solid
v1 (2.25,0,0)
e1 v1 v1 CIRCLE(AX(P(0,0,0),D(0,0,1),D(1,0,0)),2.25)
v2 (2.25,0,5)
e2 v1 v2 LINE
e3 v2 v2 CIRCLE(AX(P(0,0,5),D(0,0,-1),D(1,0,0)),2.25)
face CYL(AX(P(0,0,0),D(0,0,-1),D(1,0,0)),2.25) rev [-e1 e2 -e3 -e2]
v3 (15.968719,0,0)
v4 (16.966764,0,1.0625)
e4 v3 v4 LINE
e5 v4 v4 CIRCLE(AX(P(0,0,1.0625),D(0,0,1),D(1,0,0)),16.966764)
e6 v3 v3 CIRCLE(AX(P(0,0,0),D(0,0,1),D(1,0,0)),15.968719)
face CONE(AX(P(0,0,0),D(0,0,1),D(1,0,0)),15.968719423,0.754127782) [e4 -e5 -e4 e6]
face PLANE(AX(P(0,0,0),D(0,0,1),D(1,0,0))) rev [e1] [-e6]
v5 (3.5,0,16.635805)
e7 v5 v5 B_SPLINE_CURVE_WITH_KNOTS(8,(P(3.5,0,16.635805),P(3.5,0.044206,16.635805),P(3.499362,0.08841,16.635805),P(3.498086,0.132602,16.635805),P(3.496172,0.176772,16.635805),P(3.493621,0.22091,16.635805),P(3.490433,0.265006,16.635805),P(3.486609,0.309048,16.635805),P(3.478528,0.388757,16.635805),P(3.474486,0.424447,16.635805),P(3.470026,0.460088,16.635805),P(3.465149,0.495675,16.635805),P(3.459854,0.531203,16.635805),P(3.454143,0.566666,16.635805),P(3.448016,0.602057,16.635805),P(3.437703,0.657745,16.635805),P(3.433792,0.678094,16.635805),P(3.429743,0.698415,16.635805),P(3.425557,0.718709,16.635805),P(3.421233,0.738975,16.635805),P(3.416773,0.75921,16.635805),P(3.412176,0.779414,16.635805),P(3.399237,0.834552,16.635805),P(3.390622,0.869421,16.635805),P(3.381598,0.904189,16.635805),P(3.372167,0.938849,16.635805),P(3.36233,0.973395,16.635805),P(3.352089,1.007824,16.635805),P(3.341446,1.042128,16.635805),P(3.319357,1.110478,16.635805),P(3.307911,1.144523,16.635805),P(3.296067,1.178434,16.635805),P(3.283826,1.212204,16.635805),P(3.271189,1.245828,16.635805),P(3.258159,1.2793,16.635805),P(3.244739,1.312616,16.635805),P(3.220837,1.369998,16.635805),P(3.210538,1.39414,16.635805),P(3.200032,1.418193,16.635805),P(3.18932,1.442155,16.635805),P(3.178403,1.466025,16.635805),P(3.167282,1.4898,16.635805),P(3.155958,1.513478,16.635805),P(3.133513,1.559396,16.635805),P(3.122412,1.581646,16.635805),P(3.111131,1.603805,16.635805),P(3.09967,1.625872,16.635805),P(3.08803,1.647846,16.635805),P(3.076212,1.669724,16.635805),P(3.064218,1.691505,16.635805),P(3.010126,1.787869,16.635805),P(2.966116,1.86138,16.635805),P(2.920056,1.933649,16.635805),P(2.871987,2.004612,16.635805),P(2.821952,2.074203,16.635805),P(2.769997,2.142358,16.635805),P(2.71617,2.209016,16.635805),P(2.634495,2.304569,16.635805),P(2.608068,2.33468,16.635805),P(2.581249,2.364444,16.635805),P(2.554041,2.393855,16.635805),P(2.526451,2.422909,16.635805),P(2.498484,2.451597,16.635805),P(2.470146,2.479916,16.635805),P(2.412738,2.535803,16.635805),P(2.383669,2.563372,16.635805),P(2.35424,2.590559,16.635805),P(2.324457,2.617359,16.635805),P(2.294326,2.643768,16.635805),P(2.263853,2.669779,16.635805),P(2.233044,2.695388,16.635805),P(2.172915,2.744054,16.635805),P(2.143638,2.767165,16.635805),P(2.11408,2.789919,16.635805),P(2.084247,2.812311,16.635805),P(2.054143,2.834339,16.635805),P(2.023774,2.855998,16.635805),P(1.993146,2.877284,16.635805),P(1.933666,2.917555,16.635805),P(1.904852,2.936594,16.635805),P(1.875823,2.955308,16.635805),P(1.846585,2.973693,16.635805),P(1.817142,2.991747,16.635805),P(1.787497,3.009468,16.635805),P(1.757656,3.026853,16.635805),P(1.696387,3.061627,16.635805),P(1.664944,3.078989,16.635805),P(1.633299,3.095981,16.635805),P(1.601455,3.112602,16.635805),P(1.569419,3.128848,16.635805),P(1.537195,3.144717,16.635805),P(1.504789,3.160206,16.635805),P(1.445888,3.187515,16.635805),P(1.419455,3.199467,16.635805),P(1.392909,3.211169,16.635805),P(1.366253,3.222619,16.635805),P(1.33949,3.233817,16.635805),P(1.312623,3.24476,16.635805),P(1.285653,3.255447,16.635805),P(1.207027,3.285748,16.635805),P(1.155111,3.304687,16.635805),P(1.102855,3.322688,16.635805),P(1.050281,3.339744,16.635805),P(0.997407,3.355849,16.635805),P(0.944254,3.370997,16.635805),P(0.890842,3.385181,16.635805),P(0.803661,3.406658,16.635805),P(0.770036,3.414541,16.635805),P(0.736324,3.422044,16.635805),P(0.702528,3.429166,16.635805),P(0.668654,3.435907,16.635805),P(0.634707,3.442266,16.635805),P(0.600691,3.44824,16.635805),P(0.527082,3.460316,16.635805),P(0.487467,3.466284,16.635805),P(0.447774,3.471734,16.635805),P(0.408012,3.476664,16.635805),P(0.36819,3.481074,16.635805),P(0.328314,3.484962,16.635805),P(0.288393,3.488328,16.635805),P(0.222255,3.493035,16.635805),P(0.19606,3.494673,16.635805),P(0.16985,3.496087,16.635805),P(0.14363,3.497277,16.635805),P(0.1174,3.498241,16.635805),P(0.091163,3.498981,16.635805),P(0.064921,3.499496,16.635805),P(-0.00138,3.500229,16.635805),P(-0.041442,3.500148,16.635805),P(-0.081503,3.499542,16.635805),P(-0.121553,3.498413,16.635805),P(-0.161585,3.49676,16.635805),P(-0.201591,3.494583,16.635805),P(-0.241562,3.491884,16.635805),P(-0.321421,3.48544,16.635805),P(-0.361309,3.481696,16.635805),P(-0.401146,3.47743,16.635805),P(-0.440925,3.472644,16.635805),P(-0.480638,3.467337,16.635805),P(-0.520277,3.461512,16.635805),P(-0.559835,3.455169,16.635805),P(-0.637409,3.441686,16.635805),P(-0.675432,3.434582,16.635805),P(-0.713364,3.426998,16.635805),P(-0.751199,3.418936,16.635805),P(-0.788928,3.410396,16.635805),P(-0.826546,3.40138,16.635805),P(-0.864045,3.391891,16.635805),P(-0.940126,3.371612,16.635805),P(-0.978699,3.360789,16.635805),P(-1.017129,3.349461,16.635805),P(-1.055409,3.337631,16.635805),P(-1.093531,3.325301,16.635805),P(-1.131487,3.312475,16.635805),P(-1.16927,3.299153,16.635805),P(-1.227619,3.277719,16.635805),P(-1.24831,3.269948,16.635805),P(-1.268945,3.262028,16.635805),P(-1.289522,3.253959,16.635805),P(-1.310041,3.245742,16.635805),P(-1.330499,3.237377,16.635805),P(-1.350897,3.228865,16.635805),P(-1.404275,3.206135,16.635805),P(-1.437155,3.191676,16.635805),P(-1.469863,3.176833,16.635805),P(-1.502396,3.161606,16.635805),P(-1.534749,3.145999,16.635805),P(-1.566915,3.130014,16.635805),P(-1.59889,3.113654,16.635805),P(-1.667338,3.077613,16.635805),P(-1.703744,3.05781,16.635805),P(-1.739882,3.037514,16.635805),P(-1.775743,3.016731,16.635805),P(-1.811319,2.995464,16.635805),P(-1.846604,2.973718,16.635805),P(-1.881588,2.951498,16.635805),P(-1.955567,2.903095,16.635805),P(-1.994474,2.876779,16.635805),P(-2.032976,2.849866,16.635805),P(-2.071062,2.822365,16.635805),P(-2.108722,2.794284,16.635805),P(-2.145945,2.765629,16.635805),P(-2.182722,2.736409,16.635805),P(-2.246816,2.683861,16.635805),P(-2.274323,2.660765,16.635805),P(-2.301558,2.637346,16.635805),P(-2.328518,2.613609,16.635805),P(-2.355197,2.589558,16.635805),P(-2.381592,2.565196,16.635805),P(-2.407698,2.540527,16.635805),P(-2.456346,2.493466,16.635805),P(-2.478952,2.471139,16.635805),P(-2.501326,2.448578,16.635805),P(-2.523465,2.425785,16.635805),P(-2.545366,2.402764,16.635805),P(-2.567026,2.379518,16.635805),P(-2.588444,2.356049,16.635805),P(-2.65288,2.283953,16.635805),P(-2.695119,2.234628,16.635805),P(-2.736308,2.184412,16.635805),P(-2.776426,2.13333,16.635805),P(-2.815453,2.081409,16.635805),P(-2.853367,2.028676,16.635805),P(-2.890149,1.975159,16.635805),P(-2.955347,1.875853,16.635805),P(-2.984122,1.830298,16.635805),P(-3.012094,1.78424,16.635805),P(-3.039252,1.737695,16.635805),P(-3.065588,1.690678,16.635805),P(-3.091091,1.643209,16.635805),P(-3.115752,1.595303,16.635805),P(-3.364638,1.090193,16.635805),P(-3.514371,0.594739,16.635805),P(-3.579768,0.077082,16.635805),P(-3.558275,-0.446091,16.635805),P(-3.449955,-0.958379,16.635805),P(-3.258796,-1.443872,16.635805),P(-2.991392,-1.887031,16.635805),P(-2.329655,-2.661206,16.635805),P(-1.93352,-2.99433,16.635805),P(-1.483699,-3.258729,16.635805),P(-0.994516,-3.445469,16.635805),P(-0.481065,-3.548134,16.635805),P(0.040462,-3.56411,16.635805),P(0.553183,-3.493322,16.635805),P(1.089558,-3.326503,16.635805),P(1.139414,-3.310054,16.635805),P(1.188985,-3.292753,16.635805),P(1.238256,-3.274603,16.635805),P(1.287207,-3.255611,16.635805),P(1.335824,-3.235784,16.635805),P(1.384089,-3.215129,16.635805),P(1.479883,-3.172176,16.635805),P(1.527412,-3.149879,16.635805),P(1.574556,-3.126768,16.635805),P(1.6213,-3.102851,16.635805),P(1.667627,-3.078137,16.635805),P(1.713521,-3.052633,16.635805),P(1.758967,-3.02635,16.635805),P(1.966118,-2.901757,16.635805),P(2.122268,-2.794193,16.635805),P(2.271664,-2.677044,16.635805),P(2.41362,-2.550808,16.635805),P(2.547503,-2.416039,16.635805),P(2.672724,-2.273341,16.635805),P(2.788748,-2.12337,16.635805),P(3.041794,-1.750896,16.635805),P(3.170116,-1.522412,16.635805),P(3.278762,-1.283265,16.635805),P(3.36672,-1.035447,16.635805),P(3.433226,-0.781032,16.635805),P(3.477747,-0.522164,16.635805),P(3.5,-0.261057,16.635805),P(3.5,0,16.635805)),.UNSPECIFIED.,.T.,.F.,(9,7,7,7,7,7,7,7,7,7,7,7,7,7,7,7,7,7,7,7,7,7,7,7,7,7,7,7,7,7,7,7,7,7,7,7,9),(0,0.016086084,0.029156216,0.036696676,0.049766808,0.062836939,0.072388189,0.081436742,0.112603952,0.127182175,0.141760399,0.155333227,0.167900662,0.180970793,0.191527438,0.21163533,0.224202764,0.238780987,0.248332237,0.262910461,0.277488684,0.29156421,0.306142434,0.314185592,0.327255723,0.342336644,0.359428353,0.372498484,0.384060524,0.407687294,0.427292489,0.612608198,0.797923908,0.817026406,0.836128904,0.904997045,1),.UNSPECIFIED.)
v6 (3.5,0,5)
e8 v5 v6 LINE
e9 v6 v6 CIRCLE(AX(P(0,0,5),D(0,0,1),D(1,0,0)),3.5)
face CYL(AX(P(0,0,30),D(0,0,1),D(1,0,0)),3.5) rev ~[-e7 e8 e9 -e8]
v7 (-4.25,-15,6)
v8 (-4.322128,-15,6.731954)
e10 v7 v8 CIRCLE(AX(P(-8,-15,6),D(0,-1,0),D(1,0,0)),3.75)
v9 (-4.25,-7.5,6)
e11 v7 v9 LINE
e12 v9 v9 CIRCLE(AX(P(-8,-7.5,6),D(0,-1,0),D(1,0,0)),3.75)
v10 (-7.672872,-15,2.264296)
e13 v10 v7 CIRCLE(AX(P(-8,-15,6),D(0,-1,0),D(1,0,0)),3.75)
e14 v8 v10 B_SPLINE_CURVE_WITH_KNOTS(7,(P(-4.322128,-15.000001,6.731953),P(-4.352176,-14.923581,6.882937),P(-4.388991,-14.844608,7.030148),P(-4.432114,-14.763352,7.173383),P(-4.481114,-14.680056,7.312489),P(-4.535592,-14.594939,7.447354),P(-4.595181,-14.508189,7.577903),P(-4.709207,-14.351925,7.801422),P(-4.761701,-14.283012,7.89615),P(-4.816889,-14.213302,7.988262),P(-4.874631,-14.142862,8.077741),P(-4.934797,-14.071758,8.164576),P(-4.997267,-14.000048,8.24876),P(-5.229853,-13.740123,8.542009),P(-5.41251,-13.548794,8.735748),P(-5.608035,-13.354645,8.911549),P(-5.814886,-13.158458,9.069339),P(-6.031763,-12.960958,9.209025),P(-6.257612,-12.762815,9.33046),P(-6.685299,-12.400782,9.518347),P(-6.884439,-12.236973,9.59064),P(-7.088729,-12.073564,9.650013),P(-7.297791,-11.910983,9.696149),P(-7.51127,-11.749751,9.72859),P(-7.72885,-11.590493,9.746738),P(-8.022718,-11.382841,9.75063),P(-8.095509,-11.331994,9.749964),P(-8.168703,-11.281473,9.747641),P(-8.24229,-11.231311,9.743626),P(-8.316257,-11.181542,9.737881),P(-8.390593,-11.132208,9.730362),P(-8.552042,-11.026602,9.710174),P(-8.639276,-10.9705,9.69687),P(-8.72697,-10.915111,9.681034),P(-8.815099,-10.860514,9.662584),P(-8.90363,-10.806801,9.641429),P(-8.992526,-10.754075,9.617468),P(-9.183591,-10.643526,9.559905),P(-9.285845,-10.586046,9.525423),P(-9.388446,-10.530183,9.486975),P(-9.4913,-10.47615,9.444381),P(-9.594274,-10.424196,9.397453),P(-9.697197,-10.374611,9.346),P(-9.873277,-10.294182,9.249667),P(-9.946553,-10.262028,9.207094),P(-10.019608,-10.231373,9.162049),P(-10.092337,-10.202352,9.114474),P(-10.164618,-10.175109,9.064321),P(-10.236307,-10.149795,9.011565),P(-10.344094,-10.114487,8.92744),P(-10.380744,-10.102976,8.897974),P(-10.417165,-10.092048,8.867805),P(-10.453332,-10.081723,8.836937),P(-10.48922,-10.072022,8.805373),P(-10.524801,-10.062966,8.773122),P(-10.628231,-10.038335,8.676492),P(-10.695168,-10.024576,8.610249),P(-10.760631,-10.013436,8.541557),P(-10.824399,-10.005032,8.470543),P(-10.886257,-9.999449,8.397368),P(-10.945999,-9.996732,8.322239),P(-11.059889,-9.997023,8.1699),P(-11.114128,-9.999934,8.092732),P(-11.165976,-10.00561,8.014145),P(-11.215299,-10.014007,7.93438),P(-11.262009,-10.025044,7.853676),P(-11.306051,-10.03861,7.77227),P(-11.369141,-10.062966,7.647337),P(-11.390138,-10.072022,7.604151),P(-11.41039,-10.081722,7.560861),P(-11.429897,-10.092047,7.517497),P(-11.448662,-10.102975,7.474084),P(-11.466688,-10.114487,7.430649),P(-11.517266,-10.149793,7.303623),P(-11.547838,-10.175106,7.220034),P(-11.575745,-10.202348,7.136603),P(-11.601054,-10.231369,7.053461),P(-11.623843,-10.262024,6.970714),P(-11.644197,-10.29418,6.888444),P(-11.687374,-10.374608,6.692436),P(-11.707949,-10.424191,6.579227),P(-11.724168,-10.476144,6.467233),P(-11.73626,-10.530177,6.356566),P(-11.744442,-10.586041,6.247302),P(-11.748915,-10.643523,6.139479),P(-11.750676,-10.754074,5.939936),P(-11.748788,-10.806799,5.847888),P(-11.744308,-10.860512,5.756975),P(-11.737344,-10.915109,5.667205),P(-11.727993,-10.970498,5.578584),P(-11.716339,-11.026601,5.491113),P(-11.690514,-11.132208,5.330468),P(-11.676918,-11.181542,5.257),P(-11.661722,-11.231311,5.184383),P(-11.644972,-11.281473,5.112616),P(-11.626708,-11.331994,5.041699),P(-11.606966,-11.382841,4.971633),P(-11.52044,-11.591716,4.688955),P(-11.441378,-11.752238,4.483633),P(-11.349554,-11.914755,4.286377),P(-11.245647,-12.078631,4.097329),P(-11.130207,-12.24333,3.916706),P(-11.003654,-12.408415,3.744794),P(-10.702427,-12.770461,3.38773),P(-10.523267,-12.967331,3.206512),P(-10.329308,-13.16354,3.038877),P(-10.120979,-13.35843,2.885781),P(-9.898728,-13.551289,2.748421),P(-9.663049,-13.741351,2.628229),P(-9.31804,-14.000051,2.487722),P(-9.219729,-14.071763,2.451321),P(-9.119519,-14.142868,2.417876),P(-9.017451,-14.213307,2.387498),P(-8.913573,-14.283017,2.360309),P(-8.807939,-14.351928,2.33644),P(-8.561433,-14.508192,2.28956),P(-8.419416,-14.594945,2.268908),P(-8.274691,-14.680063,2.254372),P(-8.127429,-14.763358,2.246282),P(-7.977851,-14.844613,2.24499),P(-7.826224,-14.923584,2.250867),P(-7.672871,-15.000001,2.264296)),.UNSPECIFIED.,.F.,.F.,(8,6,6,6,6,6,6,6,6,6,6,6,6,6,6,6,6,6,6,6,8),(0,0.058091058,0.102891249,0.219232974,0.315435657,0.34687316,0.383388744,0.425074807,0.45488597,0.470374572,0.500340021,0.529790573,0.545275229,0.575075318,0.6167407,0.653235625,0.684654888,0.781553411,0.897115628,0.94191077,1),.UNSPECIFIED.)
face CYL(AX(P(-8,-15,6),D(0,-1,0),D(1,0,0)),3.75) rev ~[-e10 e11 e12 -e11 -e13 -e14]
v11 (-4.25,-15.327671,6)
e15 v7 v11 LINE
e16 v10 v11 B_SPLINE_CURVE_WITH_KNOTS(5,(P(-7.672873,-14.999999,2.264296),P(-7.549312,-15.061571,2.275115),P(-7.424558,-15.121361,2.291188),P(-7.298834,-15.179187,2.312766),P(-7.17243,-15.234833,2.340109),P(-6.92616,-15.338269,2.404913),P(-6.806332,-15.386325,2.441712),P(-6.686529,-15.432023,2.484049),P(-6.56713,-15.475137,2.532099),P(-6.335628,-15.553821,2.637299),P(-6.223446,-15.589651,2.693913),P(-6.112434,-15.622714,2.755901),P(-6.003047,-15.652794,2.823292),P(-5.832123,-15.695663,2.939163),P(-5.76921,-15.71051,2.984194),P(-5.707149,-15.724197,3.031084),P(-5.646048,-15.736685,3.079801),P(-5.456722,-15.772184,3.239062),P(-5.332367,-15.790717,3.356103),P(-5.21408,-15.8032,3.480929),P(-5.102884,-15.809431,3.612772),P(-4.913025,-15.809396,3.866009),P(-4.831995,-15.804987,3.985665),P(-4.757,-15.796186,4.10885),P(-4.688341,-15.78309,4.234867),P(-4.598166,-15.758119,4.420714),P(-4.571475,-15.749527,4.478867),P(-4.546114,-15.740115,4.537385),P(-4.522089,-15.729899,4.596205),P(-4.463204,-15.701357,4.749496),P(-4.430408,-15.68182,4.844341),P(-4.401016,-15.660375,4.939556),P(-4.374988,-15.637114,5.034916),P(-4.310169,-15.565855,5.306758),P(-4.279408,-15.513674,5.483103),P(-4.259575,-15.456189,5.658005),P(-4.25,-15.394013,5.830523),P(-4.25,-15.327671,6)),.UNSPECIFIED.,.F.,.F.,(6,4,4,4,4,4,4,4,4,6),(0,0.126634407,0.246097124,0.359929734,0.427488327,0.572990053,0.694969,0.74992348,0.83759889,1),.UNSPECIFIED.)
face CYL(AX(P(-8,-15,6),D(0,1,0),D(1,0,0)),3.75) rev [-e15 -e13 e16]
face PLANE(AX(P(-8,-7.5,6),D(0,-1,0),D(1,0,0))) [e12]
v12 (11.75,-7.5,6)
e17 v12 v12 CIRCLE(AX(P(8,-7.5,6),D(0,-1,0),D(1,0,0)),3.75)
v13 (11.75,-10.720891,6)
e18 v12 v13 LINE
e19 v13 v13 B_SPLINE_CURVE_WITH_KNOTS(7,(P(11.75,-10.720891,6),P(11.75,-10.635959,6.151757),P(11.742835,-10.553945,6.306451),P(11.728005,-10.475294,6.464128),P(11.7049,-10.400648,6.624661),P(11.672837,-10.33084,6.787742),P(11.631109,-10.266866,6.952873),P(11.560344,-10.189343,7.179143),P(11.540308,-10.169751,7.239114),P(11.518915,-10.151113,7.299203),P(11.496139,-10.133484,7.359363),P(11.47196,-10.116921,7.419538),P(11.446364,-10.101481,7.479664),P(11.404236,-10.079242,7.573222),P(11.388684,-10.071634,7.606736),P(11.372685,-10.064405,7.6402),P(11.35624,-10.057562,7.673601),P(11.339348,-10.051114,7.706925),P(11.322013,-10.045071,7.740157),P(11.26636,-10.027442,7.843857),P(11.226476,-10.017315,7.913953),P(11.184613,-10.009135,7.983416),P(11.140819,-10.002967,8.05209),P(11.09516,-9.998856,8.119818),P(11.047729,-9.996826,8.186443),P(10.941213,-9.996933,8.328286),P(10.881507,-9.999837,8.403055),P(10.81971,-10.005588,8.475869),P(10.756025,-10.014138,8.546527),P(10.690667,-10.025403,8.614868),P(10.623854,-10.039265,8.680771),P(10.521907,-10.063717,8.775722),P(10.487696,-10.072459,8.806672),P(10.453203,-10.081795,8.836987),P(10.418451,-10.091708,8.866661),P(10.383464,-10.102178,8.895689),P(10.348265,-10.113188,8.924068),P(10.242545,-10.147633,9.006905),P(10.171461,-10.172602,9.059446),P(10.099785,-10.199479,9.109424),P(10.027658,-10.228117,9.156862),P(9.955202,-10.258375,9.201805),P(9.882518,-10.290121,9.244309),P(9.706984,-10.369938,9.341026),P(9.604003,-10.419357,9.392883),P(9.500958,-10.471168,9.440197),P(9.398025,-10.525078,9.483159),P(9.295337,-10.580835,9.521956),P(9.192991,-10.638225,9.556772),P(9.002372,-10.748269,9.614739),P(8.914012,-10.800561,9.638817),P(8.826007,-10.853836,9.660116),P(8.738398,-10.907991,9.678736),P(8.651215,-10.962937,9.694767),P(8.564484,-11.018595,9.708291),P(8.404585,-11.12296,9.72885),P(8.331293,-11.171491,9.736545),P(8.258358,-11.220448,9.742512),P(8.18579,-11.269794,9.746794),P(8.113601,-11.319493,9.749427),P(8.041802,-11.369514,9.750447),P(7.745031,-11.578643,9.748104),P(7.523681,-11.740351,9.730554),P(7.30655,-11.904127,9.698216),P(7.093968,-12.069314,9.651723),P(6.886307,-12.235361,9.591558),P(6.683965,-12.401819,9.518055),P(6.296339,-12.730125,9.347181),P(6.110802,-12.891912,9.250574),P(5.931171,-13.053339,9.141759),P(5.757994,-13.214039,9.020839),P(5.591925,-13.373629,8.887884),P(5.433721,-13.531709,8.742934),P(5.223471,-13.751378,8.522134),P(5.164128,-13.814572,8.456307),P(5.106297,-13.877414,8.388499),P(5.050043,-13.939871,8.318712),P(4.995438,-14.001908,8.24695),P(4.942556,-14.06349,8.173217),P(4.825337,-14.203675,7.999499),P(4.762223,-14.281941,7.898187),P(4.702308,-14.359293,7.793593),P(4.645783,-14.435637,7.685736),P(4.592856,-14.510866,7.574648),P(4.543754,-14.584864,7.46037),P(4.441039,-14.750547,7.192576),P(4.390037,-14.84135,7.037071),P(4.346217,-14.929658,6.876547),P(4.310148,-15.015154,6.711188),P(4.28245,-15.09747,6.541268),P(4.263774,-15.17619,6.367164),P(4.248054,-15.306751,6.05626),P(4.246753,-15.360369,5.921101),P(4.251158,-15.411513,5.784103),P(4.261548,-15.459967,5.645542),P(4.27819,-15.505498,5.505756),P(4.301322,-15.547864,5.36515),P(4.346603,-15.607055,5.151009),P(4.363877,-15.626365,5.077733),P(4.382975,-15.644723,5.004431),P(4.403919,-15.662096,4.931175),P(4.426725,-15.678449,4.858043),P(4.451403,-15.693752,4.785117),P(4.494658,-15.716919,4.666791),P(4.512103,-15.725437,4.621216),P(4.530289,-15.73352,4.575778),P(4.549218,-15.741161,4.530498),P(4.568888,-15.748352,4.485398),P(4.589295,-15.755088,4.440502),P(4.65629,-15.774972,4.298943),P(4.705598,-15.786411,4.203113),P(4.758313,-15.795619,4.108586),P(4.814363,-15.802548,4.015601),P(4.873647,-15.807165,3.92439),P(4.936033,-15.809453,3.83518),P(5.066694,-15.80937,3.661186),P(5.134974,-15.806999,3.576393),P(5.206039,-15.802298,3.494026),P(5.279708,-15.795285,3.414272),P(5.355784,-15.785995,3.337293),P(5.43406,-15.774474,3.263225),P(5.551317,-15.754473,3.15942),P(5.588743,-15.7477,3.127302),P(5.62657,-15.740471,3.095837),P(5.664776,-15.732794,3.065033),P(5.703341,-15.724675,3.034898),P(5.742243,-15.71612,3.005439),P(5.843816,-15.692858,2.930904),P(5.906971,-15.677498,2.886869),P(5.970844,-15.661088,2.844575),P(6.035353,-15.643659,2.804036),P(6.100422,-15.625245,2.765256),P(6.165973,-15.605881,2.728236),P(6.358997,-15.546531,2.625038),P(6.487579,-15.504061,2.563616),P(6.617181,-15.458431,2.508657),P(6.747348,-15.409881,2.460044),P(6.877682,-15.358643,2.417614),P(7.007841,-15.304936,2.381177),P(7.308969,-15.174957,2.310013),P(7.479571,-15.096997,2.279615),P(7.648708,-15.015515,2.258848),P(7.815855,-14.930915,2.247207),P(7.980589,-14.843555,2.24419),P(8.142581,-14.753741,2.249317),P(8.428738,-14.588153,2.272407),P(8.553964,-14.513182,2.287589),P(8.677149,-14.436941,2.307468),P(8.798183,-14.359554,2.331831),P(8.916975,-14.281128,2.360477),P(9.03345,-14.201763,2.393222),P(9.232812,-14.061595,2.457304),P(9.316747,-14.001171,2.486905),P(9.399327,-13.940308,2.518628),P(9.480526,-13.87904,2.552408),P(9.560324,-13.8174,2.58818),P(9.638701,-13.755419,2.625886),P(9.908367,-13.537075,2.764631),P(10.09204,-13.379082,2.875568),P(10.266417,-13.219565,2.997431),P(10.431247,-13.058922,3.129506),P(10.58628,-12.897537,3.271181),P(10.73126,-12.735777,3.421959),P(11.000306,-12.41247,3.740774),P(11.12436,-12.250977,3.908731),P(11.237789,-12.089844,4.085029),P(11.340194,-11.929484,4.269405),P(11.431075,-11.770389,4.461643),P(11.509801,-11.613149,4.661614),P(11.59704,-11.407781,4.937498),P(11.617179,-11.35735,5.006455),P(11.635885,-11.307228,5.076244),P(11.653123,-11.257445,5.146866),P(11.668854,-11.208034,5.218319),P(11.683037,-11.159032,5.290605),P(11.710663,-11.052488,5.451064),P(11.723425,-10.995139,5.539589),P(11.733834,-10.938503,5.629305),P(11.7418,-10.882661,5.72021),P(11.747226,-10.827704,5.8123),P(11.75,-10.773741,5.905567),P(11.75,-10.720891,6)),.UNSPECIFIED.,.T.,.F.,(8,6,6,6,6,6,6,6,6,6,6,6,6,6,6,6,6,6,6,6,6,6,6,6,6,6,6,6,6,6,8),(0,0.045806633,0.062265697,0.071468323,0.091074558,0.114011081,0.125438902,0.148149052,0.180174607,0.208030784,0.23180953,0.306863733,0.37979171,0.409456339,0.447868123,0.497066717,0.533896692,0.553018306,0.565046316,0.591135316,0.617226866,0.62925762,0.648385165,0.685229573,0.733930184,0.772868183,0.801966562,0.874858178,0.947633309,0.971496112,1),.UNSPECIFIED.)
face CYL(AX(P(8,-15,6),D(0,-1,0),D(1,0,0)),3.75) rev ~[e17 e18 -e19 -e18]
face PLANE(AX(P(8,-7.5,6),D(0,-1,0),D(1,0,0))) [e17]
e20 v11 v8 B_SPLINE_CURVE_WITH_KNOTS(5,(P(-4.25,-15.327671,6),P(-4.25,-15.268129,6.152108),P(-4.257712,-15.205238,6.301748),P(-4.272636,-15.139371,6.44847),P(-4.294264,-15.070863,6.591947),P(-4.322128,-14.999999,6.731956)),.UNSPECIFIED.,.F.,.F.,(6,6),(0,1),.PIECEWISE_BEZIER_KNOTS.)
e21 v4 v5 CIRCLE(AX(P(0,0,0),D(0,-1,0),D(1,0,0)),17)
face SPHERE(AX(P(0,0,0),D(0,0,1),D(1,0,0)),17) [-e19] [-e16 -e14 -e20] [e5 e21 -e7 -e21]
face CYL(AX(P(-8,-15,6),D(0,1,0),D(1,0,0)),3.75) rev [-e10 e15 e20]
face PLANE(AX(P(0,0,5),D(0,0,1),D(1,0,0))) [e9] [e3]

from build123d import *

# Parameters (mm, degrees)
F3_R      = 3.75
F4_DEPTH  = 7.5
F6_R      = 2.25
F7_DEPTH  = 17.001
F9_R      = 3.5
F10_DEPTH = 25


# Not quite as in the source:
# - a fillet or chamfer that OpenCascade refuses, or shapes differently, is made with other operations: its cross-section is extruded or revolved along the edge and cut away or added


with BuildPart() as f1:
    # F0 (on Front) → F1 (revolve)
    with BuildSketch(Plane.XZ):
        with BuildLine():
            Line((0, 0), (17, 0))
            ThreePointArc((17, 0), (12.0208152802, 12.0208152802), (0, 17))
            Line((0, 17), (0, 0))
        make_face()
    revolve(axis=Axis((0, 0, 8.5), (0, 0, 1)))

    # F3 (on offset) → F4 (cut, symmetric)
    with BuildSketch(Plane.XZ.offset(15)):
        with Locations((-8, 6)):
            Circle(F3_R)
        with Locations((8, 6)):
            Circle(F3_R)
    extrude(amount=F4_DEPTH, both=True, mode=Mode.SUBTRACT)

    # F5: chamfer of 1 on 1 edges, made by hand

    # F5_s1 → F5_t2 (revolve, cut)
    with BuildSketch(Plane.XZ):
        with BuildLine():
            Line((15.9687194227, 0), (16.9667643866, 1.0625))
            ThreePointArc((16.9667643866, 1.0625), (16.9912411836, 0.54564003), (17, 0))
            Line((17, 0), (15.9687194227, 0))
        make_face()
    revolve(axis=Axis((0, 0, 0), (0, 0, 1)), mode=Mode.SUBTRACT)

    # F6 (on Top) → F7 (cut, through all)
    with BuildSketch(Plane.XY):
        Circle(F6_R)
    extrude(amount=F7_DEPTH, mode=Mode.SUBTRACT)

    # F9 (on offset) → F10 (cut)
    with BuildSketch(Plane.XY.offset(30)):
        Circle(F9_R)
    extrude(amount=-F10_DEPTH, mode=Mode.SUBTRACT)


solid = f1.part
